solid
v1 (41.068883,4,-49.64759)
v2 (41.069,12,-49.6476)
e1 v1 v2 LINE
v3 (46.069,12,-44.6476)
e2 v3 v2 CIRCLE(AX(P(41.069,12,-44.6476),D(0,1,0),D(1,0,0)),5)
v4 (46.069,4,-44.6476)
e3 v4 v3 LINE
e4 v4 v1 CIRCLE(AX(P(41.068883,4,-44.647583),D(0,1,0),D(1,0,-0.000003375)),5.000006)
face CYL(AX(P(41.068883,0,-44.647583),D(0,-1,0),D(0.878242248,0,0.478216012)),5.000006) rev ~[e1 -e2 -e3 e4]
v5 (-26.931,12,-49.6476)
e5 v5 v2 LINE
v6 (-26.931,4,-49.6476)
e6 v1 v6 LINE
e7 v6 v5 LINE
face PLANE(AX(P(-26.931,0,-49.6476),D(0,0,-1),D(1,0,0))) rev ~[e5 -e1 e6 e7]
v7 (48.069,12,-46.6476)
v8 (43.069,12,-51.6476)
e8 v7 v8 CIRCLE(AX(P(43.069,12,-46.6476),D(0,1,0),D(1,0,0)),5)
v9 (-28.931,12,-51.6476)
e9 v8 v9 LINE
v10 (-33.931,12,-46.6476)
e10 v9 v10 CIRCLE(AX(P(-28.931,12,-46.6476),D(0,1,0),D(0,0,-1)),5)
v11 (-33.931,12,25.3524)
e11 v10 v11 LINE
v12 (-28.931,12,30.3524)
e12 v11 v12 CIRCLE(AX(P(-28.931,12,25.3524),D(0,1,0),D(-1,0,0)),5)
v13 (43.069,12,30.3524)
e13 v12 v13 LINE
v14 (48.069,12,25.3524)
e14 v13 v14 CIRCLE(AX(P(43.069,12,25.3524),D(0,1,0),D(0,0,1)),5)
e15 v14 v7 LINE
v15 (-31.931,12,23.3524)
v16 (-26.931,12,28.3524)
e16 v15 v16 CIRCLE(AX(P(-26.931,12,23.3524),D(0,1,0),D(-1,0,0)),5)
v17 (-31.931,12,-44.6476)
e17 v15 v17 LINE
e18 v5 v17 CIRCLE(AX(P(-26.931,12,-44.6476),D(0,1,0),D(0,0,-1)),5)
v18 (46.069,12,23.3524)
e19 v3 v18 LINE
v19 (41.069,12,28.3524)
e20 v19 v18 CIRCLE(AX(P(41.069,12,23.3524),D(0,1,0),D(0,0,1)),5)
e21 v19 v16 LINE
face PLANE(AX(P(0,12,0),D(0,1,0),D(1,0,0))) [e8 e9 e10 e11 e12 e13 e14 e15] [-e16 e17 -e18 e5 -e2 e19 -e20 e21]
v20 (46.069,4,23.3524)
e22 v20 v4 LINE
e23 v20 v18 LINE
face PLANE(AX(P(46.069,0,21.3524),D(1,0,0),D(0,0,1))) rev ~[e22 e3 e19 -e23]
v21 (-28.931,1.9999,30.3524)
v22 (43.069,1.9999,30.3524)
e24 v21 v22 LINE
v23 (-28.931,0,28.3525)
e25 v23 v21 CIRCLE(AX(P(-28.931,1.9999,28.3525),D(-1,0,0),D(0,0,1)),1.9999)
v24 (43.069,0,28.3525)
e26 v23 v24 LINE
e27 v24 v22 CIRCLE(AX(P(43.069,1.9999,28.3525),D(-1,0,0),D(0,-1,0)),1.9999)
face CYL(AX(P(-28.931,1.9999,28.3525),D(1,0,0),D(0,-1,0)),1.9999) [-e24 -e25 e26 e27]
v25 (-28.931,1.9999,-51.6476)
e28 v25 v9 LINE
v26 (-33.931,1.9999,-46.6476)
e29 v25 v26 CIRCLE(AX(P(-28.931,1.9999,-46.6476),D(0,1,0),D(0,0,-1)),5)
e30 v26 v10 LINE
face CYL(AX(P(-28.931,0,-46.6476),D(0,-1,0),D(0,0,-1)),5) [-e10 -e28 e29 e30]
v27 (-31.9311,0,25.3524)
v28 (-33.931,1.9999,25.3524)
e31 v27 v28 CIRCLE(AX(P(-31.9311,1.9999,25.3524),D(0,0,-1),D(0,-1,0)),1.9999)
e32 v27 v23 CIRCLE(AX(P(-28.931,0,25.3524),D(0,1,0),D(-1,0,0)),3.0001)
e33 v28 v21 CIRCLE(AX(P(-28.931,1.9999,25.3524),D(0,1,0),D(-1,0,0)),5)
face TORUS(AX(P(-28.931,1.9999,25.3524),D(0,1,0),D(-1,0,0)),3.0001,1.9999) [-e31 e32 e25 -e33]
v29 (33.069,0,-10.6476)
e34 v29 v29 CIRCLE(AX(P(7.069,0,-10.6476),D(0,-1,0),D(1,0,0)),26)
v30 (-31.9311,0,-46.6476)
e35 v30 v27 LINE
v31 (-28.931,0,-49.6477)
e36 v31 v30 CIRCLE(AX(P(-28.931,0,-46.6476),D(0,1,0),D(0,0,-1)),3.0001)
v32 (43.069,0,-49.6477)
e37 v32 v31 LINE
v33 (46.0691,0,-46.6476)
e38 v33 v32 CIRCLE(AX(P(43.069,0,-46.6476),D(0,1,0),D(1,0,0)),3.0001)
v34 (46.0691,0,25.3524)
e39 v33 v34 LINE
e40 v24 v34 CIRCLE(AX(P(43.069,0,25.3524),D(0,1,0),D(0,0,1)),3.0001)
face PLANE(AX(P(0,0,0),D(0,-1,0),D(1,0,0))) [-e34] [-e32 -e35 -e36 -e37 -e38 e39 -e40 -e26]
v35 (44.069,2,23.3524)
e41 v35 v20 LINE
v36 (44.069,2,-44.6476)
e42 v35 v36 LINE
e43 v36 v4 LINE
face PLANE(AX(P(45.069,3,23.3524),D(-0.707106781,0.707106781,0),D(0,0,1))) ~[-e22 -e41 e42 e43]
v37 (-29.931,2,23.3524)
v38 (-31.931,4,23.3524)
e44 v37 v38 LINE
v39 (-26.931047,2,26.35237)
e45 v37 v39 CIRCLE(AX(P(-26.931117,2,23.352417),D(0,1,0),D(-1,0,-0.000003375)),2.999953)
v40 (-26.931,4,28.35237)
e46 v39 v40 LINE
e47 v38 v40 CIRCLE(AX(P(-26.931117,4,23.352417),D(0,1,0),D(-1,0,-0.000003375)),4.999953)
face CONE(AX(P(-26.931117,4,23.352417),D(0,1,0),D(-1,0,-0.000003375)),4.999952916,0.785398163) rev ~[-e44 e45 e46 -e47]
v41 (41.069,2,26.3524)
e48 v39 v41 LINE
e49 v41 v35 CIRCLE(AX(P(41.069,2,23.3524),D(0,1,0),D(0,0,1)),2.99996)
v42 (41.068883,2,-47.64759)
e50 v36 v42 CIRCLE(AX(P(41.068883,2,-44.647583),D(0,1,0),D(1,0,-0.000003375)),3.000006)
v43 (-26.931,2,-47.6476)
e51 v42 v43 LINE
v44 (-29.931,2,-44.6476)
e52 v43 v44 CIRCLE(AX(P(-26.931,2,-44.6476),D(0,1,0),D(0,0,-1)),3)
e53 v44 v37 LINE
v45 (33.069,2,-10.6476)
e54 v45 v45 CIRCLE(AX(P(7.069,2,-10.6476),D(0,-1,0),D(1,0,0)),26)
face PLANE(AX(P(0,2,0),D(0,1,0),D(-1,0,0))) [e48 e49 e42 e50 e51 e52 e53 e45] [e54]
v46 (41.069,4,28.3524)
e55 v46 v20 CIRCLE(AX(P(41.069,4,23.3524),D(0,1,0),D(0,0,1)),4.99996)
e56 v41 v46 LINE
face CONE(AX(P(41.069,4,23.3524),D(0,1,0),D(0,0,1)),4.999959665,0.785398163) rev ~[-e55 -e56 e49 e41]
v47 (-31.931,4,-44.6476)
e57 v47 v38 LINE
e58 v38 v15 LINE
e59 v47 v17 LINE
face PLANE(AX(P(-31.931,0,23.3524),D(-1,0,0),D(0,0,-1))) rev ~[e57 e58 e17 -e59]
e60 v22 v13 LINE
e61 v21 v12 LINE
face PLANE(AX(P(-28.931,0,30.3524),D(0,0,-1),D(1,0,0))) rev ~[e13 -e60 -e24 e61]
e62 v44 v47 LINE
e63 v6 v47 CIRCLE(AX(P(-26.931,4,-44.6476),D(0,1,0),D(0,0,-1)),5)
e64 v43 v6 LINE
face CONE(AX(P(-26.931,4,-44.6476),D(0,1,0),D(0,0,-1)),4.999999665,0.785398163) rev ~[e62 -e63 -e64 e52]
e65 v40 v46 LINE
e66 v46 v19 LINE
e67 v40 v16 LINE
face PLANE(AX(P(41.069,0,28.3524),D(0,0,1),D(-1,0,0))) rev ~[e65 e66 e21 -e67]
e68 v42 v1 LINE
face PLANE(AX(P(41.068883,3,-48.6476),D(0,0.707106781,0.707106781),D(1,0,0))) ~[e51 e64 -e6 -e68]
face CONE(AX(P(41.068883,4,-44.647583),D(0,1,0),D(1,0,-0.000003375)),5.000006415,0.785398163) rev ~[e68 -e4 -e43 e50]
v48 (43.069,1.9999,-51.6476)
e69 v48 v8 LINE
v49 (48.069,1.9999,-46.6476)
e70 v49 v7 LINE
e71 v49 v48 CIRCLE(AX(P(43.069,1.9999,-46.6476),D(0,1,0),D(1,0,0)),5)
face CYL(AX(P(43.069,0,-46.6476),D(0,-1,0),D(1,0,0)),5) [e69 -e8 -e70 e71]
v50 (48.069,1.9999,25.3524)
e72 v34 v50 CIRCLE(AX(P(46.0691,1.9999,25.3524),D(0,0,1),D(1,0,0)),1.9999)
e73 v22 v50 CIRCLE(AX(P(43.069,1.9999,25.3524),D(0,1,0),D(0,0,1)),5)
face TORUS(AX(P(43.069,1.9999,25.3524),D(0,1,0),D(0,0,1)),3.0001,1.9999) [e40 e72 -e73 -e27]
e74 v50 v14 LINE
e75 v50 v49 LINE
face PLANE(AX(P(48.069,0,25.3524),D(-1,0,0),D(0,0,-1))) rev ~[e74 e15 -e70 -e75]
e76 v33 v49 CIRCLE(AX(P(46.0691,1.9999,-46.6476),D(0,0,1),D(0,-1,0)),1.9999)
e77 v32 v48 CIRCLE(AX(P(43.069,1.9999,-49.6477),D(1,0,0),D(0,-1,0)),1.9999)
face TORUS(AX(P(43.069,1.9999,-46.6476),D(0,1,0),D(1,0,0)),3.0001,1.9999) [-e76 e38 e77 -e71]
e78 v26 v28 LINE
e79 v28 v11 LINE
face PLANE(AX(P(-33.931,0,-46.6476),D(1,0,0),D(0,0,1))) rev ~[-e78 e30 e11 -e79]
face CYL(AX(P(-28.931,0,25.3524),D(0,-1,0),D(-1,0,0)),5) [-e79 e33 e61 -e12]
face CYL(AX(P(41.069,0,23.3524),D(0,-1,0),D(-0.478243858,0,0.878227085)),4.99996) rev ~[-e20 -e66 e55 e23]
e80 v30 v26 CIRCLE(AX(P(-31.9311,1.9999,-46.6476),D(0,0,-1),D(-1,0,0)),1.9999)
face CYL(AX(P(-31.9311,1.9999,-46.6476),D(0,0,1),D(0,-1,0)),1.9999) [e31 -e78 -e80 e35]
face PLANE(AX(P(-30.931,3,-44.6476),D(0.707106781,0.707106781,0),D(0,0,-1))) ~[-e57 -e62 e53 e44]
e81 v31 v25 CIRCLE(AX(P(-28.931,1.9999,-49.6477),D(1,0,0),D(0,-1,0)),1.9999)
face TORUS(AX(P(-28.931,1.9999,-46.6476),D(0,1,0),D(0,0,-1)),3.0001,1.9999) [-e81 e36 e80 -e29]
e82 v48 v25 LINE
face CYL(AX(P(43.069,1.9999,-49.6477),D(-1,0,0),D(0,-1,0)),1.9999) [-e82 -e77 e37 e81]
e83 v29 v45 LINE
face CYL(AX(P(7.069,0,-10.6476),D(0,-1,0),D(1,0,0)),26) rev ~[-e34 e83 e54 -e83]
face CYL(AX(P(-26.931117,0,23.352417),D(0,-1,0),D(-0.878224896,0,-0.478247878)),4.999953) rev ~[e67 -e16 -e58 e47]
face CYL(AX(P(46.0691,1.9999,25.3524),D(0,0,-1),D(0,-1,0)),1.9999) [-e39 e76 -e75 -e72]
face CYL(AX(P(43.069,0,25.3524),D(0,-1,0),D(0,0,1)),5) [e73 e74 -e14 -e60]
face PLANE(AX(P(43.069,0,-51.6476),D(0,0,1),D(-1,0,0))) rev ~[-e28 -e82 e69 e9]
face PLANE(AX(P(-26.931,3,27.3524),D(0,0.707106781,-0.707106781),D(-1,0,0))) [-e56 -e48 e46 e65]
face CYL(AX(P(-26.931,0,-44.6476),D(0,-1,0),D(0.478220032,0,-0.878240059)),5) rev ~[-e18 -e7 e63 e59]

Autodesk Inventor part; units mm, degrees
ref_plane "YZ Plane" through (0, 0, 0) normal (1, 0, 0) x (0, 1, 0)
ref_plane "XZ Plane" through (0, 0, 0) normal (0, 1, 0) x (-1, 0, 0)
ref_plane "XY Plane" through (0, 0, 0) normal (0, 0, 1) x (1, 0, 0)
sketch "Sketch1" plane through (0, 0, 0) normal (0, 1, 0) x (-1, 0, 0)
  line L0 (28.931, 30.3524) -> (-43.069, 30.3524)
  line L1 (-48.069, 25.3524) -> (-48.069, -51.6476)
  line L2 (-43.069, -51.6476) -> (33.931, -51.6476)
  line L3 (33.931, -46.6476) -> (33.931, 30.3524)
  arc A0 (-48.069, -46.6476) -> (-43.069, -51.6476) centre (-43.069, -46.6476) ccw
  line L4 (-46.069, 28.3524) -> (26.931, 28.3524)
  line L5 (31.931, 23.3524) -> (31.931, -44.6476)
  line L6 (31.931, -49.6476) -> (-46.069, -49.6476)
  line L7 (-46.069, -44.6476) -> (-46.069, 23.3524)
  arc A1 (-38.6778, 27.7435) -> (-45.4601, 20.9612) centre (-41.069, 23.3524) ccw
  arc A2 (24.5399, -49.0388) -> (31.3222, -42.2565) centre (26.931, -44.6476) ccw
  arc A3 (31.3222, 20.9612) -> (24.5399, 27.7435) centre (26.931, 23.3524) ccw
  arc A4 (-45.4601, -42.2565) -> (-38.6778, -49.0388) centre (-41.069, -44.6476) ccw
  arc A5 (33.931, 25.3524) -> (28.931, 30.3524) centre (28.931, 25.3524) ccw
  arc A6 (-46.069, 21.3524) -> (-45.4601, 20.9612) centre (-43.069, 25.3524) ccw
  arc A7 (-43.069, 30.3524) -> (-48.069, 25.3524) centre (-43.069, 25.3524) ccw
  arc A8 (28.931, -51.6476) -> (33.931, -46.6476) centre (28.931, -46.6476) ccw
  point P0 (0, 0)
  point P1 (-41.069, -49.6476)
  point P2 (26.931, -49.6476)
  point P3 (-41.069, 28.3524)
  dimension "d0" = 82
  dimension "d1" = 82
  dimension "d3" = 10
  dimension "d7" = 78
  dimension "d8" = 78
  dimension "d9" = 2
  dimension "d10" = 2
  dimension "d11" = 10
  dimension "d12" = 10
  dimension "d13" = 10
  dimension "d14" = 10
extrude "Extrusion1" add sketch "Sketch1" along normal blind 2 contours L4 A3 L5 A2 L6 A4 L7 A6 A1
extrude "Extrusion2" add sketch "Sketch1" along normal blind 15
sketch "Sketch2" plane through (0, 0, 0) normal (0, -1, 0) x (1, 0, 0)
  line L0 (48.069, 25.3524) -> (48.069, -46.6476) projected
  arc A0 (48.069, 25.3524) -> (43.069, 30.3524) centre (43.069, 25.3524) ccw projected
  line L1 (-28.931, 30.3524) -> (43.069, 30.3524) projected
  arc A1 (-28.931, 30.3524) -> (-33.931, 25.3524) centre (-28.931, 25.3524) ccw projected
  line L2 (-33.931, -46.6476) -> (-33.931, 25.3524) projected
  arc A2 (-33.931, -46.6476) -> (-28.931, -51.6476) centre (-28.931, -46.6476) ccw projected
  line L3 (43.069, -51.6476) -> (-28.931, -51.6476) projected
  arc A3 (43.069, -51.6476) -> (48.069, -46.6476) centre (43.069, -46.6476) ccw projected
  arc A4 (45.4601, 20.9612) -> (46.069, 21.3524) centre (43.069, 25.3524) ccw projected
  arc A5 (45.4601, 20.9612) -> (46.069, 23.3524) centre (41.069, 23.3524) ccw projected
  line L4 (46.069, 21.3524) -> (46.069, 23.3524) projected
  circle A6 centre (7.069, -10.6476) radius 26
  point P0 (0, 0)
  dimension "d19" = 52
extrude "Extrusion3" cut sketch "Sketch2" along normal mid plane 15 contours A6
sketch "Sketch3" plane through (0, 15, 0) normal (0, 1, 0) x (1, 0, 0)
  line L0 (48.069, -25.3524) -> (48.069, 46.6476) projected
  arc A0 (48.069, 46.6476) -> (43.069, 51.6476) centre (43.069, 46.6476) ccw projected
  line L1 (43.069, 51.6476) -> (-28.931, 51.6476) projected
  arc A1 (-28.931, 51.6476) -> (-33.931, 46.6476) centre (-28.931, 46.6476) ccw projected
  line L2 (-33.931, 46.6476) -> (-33.931, -25.3524) projected
  arc A2 (-33.931, -25.3524) -> (-28.931, -30.3524) centre (-28.931, -25.3524) ccw projected
  line L3 (-28.931, -30.3524) -> (43.069, -30.3524) projected
  arc A3 (43.069, -30.3524) -> (48.069, -25.3524) centre (43.069, -25.3524) ccw projected
  arc A4 (46.069, 44.6476) -> (41.069, 49.6476) centre (41.069, 44.6476) ccw projected
  line L4 (46.069, 44.6476) -> (46.069, -23.3524) projected
  arc A5 (41.069, -28.3524) -> (46.069, -23.3524) centre (41.069, -23.3524) ccw projected
  line L5 (41.069, -28.3524) -> (-26.931, -28.3524) projected
  arc A6 (-31.931, -23.3524) -> (-26.931, -28.3524) centre (-26.931, -23.3524) ccw projected
  line L6 (-31.931, -23.3524) -> (-31.931, 44.6476) projected
  arc A7 (-26.931, 49.6476) -> (-31.931, 44.6476) centre (-26.931, 44.6476) ccw projected
  line L7 (-26.931, 49.6476) -> (41.069, 49.6476) projected
  point P0 (0, 0)
extrude "Extrusion4" cut sketch "Sketch3" against normal blind 3
fillet "Fillet1" radius 2 8 edges at (7.069, 0, -51.6476) (-32.4666, 0, -50.1832) (-33.931, 0, -10.6476) (-32.4666, 0, 28.8879) (7.069, 0, 30.3524) (46.6045, 0, 28.8879) (48.069, 0, -10.6476) (46.6045, 0, -50.1832)
sketch "Sketch4" plane through (0, 0, 0) normal (0, -1, 0) x (1, 0, 0)
  line L0 (46.069, 21.3524) -> (46.069, -46.6476) projected
  arc A0 (45.4601, 20.9612) -> (46.069, 21.3524) centre (43.069, 25.3524) ccw projected
  arc A1 (45.4601, 20.9612) -> (46.069, 23.3524) centre (41.069, 23.3524) ccw projected
  line L1 (46.069, 25.3524) -> (46.069, 23.3524) projected
  arc A2 (46.069, 25.3524) -> (43.069, 28.3524) centre (43.069, 25.3524) ccw projected
  line L2 (-28.931, 28.3524) -> (43.069, 28.3524) projected
  arc A3 (-28.931, 28.3524) -> (-31.931, 25.3524) centre (-28.931, 25.3524) ccw projected
  line L3 (-31.931, -46.6476) -> (-31.931, 25.3524) projected
  arc A4 (-31.931, -46.6476) -> (-28.931, -49.6476) centre (-28.931, -46.6476) ccw projected
  line L4 (43.069, -49.6476) -> (-28.931, -49.6476) projected
  arc A5 (43.069, -49.6476) -> (46.069, -46.6476) centre (43.069, -46.6476) ccw projected
  circle A6 centre (7.069, -10.6476) radius 26 projected
  line L5 (46.069, 23.3524) -> (46.069, -44.6476) projected
  line L6 (46.069, 21.3524) -> (46.069, 23.3524)
  point P0 (0, 0)
extrude "Extrusion5" add sketch "Sketch4" against normal blind 2 contours A0 A1 L5
chamfer "Chamfer1" distance 2 angle 45 8 edges at (46.069, 2, -10.6476) (44.6045, 2, 26.8879) (7.069, 2, 28.3524) (-30.4666, 2, 26.8879) (-31.931, 2, -10.6476) (-30.4666, 2, -48.1832) (7.069, 2, -49.6476) (44.6045, 2, -48.1832)
properties part number "controler_03"
